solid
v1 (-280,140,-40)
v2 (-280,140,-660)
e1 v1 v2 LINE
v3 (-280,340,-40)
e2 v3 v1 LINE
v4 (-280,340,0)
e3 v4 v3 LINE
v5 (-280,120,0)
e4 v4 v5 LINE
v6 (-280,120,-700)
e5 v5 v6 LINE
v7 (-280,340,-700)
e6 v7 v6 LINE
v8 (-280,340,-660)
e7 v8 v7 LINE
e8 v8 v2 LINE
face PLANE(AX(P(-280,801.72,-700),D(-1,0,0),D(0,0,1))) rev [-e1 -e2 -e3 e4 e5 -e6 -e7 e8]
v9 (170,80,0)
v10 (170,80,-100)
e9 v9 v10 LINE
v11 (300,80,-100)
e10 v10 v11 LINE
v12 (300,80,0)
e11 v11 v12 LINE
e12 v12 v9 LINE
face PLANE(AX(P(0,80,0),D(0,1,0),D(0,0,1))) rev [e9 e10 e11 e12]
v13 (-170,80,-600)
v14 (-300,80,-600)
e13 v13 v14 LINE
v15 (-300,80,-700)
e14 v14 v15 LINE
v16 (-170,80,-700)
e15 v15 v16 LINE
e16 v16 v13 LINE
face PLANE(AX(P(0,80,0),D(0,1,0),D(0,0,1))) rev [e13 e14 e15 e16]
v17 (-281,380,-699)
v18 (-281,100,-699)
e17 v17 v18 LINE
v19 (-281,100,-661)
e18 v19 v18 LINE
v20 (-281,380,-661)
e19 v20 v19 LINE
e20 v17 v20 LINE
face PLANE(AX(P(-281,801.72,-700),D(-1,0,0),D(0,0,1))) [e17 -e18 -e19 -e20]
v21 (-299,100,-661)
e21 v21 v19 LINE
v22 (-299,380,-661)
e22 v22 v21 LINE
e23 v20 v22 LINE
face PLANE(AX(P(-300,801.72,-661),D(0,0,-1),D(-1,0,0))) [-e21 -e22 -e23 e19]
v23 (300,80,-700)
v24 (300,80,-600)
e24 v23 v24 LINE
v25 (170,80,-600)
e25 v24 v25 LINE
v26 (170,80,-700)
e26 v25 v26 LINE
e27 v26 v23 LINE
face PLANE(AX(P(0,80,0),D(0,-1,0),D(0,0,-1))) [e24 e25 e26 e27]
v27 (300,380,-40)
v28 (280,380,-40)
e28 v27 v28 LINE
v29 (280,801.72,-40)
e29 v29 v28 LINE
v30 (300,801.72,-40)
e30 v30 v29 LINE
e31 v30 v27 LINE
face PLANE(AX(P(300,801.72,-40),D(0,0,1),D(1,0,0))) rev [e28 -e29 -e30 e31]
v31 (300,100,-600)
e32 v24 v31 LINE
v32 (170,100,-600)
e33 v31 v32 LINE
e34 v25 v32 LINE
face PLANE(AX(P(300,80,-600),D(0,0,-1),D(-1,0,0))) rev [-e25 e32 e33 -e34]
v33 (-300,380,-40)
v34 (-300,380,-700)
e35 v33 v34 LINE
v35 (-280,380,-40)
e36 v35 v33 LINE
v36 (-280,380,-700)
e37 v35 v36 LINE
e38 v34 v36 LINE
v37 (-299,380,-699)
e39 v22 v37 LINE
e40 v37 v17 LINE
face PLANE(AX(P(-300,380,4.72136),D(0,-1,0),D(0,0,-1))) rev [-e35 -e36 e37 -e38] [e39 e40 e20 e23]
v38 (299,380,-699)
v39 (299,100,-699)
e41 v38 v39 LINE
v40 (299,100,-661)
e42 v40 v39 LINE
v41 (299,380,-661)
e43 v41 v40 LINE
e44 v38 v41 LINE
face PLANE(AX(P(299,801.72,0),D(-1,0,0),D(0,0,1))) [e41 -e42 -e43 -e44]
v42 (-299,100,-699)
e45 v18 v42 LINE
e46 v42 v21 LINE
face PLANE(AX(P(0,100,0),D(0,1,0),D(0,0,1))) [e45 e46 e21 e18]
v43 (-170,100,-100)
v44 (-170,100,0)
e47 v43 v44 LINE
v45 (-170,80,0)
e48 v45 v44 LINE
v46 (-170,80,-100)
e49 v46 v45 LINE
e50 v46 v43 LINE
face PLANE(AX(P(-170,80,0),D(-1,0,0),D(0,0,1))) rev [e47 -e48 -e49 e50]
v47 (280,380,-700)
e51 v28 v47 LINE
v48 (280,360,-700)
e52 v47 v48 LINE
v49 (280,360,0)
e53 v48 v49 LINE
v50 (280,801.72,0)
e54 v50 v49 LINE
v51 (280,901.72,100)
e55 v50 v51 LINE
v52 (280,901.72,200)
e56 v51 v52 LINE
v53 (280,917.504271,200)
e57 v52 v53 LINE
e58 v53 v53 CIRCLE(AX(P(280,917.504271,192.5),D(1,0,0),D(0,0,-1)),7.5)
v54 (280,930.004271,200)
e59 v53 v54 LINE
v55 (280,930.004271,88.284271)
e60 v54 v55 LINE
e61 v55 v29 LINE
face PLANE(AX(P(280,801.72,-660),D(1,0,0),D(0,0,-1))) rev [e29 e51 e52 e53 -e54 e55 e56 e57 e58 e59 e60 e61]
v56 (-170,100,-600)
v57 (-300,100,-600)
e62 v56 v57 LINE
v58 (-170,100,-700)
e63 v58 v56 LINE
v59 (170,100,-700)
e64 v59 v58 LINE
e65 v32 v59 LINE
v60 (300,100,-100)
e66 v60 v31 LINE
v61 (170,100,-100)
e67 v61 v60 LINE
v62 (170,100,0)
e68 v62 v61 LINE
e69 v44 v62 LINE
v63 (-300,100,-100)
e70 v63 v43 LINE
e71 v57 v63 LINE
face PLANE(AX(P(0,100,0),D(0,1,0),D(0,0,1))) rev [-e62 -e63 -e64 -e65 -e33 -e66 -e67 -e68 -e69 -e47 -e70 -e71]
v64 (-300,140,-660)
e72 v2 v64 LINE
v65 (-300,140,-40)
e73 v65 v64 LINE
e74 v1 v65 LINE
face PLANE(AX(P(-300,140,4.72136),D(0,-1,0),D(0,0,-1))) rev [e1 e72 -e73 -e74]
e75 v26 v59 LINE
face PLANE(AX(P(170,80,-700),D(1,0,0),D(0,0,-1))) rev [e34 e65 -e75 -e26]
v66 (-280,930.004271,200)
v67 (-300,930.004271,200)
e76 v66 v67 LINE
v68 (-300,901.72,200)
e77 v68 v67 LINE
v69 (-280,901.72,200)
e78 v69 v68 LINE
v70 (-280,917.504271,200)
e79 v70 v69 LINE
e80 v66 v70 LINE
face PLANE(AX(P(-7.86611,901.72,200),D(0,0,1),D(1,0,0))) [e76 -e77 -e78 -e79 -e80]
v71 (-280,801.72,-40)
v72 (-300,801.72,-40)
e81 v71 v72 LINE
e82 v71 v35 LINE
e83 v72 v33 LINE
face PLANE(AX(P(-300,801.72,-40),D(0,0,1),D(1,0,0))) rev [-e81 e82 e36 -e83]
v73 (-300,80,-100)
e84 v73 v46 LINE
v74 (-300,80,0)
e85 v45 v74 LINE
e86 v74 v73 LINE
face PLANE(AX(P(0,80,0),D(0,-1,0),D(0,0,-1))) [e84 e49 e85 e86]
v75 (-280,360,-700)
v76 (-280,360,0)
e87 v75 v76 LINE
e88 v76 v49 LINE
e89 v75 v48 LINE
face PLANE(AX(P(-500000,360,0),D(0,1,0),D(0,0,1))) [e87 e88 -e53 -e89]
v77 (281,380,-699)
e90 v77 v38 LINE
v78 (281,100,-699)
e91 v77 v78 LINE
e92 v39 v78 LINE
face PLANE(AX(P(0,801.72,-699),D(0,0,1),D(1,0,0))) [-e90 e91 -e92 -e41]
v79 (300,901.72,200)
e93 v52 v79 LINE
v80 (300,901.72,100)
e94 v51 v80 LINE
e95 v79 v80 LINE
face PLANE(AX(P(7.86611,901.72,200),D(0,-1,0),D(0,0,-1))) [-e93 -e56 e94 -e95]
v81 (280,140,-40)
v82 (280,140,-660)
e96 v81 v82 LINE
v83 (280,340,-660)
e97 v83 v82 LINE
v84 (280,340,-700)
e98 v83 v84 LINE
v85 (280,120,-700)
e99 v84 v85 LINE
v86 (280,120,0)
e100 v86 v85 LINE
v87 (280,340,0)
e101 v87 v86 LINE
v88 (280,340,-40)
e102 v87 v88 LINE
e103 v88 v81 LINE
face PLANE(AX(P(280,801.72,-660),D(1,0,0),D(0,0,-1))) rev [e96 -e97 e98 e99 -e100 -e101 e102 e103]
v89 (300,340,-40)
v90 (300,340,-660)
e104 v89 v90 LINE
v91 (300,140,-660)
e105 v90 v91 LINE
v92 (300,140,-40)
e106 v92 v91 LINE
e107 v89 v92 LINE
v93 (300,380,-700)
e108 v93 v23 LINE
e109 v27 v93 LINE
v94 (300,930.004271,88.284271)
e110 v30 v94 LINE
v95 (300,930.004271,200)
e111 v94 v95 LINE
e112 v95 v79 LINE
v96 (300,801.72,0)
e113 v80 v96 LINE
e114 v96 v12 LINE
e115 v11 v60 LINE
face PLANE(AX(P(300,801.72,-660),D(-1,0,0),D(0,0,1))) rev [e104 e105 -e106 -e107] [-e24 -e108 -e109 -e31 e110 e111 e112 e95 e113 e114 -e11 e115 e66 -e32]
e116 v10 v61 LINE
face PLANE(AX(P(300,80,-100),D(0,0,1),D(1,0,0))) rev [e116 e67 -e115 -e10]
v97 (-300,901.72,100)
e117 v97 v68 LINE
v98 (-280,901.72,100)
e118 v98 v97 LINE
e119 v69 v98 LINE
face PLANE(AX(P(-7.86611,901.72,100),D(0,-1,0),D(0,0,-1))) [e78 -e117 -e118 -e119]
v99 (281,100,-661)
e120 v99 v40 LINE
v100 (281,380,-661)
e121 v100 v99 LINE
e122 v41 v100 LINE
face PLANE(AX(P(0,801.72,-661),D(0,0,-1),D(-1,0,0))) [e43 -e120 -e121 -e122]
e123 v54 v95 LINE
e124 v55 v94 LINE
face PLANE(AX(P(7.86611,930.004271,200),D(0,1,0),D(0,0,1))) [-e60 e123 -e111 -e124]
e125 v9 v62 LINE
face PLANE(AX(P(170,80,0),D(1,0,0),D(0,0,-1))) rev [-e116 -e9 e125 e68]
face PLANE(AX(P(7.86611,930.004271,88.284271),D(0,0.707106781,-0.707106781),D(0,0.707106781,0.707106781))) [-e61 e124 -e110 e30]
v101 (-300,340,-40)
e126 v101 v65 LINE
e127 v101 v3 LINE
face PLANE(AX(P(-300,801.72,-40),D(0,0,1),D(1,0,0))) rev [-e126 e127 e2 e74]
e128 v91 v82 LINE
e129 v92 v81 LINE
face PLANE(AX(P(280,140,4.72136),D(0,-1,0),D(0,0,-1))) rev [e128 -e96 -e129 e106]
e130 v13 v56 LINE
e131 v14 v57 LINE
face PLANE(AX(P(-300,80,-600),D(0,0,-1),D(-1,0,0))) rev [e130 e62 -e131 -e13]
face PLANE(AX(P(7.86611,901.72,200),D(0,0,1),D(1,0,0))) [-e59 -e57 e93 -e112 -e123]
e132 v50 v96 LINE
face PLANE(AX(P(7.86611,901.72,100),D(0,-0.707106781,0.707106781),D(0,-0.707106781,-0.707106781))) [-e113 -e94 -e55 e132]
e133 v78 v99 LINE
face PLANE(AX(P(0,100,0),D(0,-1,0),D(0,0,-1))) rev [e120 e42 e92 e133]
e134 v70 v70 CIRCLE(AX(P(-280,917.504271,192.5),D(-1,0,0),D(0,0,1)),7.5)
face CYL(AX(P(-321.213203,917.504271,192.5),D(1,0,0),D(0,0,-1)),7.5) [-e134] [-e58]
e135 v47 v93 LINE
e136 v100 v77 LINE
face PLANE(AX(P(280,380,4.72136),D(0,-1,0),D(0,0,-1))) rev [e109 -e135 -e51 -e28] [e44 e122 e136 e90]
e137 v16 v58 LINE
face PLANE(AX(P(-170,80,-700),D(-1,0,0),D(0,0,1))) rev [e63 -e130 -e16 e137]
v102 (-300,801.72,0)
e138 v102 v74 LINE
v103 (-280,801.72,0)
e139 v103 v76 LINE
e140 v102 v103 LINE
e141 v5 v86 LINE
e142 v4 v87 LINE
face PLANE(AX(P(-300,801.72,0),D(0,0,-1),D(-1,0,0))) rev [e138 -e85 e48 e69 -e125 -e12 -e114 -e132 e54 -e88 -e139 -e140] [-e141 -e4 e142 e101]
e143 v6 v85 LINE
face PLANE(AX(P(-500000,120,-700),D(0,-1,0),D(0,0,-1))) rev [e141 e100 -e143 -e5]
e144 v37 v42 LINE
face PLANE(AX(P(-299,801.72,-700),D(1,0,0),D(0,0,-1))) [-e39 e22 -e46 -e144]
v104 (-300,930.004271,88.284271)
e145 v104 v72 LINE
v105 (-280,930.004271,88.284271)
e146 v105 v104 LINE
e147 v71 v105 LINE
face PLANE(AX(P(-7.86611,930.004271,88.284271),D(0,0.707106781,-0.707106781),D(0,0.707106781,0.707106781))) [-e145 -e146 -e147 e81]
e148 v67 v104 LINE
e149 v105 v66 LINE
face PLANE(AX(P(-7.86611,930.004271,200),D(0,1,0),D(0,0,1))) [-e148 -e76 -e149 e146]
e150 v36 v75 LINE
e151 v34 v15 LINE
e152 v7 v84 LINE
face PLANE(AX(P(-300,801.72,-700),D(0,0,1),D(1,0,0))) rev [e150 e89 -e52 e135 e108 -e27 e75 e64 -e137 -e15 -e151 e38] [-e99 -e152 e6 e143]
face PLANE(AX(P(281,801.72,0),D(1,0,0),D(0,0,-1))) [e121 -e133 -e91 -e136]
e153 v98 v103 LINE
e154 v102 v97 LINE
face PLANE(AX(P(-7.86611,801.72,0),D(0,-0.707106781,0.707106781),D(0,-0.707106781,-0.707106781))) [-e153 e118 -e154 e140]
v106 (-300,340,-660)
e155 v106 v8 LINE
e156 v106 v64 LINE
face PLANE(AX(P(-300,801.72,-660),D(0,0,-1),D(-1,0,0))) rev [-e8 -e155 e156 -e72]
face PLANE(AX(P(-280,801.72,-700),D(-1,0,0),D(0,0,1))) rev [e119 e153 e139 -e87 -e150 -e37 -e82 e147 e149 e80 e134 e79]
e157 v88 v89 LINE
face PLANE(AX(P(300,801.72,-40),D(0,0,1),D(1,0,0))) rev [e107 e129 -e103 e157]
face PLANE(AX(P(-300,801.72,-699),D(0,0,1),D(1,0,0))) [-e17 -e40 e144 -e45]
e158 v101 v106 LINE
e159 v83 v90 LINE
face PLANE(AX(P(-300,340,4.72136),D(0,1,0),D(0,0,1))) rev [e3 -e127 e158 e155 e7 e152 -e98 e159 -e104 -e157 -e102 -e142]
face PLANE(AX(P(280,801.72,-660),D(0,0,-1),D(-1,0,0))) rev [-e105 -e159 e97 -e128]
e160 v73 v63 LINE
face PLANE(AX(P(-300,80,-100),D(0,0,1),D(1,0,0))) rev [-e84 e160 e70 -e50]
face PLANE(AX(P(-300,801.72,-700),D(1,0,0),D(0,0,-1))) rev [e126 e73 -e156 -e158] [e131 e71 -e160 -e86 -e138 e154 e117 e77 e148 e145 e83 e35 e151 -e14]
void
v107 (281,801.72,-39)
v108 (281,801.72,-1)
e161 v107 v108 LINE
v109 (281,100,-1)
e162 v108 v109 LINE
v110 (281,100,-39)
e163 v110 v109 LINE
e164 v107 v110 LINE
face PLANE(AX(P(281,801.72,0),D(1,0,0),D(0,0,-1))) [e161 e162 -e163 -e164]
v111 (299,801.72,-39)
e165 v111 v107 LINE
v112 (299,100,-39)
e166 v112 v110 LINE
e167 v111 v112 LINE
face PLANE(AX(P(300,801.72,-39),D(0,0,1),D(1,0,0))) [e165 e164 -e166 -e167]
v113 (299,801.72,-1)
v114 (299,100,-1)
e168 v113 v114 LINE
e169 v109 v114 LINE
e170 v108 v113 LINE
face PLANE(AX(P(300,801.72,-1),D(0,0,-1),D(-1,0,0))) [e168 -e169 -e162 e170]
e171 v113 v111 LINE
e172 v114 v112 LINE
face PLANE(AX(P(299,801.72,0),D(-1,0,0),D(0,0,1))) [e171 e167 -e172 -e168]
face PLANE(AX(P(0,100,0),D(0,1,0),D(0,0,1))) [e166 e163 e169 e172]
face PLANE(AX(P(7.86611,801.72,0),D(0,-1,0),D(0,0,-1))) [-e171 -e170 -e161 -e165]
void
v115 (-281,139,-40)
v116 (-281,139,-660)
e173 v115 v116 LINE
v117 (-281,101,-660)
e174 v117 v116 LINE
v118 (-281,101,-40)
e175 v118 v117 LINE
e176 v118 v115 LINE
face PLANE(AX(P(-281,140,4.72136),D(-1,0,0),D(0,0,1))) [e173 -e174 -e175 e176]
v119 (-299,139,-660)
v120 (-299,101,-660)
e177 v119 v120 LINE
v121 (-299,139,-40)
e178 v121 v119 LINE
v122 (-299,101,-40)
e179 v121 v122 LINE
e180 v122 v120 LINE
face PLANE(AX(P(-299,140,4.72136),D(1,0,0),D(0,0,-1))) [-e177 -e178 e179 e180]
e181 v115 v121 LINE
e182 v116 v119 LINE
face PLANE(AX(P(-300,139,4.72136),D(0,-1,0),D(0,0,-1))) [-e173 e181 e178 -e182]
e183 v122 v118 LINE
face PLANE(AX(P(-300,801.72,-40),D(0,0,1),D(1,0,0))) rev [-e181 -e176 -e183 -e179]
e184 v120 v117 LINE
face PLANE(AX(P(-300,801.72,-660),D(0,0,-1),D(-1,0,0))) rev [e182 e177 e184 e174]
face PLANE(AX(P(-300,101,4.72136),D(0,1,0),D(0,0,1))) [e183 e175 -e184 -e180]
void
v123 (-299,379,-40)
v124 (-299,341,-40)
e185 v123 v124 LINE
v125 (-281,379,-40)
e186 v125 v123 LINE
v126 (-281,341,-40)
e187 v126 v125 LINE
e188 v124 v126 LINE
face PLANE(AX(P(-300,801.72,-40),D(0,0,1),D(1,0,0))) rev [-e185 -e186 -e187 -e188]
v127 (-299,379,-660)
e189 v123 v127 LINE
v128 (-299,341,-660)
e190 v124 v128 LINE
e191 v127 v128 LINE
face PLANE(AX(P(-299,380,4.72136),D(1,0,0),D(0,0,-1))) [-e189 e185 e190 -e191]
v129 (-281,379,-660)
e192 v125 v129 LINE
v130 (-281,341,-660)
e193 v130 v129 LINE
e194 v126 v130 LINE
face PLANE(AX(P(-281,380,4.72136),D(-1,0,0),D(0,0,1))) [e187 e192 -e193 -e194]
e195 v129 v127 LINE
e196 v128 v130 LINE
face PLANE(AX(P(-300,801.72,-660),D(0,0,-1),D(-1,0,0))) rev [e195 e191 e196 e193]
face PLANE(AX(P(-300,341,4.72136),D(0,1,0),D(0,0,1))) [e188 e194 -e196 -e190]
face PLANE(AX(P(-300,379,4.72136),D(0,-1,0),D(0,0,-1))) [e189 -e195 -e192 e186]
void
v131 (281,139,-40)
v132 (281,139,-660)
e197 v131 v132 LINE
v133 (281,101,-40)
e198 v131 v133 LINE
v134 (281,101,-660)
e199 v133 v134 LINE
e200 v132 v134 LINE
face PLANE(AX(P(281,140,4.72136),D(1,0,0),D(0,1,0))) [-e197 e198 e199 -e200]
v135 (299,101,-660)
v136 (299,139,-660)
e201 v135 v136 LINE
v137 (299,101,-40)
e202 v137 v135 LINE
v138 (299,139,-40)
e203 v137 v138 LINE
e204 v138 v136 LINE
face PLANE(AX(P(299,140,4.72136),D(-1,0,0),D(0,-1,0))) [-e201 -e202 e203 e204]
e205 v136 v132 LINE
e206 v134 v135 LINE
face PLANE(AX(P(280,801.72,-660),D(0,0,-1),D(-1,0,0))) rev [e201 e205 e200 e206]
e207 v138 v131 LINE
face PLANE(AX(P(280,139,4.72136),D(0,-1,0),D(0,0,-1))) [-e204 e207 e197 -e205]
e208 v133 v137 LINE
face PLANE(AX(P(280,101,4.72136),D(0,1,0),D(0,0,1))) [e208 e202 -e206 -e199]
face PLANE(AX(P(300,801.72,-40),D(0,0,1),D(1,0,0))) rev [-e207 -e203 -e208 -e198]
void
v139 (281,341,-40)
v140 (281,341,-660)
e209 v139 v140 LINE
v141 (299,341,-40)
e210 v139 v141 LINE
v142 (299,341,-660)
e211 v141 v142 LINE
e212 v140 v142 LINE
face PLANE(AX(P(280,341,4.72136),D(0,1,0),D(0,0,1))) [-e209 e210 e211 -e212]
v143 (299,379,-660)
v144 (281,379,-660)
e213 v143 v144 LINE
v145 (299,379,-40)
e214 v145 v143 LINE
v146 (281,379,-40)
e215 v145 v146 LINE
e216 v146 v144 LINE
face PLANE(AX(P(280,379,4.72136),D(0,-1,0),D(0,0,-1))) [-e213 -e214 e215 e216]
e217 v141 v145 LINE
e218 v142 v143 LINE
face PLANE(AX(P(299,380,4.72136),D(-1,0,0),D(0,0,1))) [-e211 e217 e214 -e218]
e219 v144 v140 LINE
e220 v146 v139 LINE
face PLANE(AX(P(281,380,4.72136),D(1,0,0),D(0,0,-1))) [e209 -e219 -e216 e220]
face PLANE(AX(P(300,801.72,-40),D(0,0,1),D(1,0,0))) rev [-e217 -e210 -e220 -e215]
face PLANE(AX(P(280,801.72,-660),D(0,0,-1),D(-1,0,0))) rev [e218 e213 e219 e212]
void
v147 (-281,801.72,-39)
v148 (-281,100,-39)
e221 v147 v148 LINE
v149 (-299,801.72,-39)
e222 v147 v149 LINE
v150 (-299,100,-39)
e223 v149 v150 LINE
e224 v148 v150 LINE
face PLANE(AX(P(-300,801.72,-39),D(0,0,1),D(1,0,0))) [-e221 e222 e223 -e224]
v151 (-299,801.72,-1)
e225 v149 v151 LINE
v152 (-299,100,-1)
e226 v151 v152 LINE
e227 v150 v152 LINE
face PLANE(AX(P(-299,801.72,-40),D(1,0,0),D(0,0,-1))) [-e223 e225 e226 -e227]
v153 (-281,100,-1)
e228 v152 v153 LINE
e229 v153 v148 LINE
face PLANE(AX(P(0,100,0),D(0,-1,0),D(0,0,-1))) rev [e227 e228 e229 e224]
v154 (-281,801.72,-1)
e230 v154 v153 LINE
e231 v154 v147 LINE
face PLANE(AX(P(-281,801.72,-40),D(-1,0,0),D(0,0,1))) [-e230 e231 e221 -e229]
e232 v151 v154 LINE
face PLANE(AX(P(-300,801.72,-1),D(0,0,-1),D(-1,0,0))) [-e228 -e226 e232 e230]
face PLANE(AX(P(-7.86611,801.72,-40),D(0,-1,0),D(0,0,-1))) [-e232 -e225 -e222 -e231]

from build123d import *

# Parameters (mm, degrees)
EXTRUDE_THIN1_START             = 100
EXTRUDE_THIN1_OUTLINE_W         = 20
EXTRUDE_THIN1_OUTLINE_H         = 40
EXTRUDE_THIN1_OUTLINE_W_2       = 18
EXTRUDE_THIN1_OUTLINE_H_2       = 38
EXTRUDE_THIN1_DEPTH             = 701.72
SKETCH5_W                       = 20
SKETCH5_H                       = 40
SKETCH5_W_2                     = 18
SKETCH5_H_2                     = 38
EXTRUDE_THIN2_DEPTH             = 620
SKETCH6_W                       = 20
SKETCH6_H                       = 421.72
CUT_EXTRUDE1_DEPTH              = 1081.904694411
BOSS_EXTRUDE1_REACH             = 1107.783
SKETCH8_W                       = 700
SKETCH8_H                       = 20
BOSS_EXTRUDE1_DIRECTION_2_REACH = 1107.783
BOSS_EXTRUDE2_REACH             = 1214.087
SKETCH9_W                       = 700
SKETCH9_H                       = 20
BOSS_EXTRUDE3_DEPTH             = 20
BOSS_EXTRUDE4_DEPTH             = 20
BOSS_EXTRUDE5_REACH             = 1311.545
SKETCH12_R                      = 7.5
SKETCH16_W                      = 130
SKETCH16_H                      = 100
BOSS_EXTRUDE6_DEPTH             = 20


# Read off the part's stored shape, not the designer's step: Extrude-Thin1
with BuildPart() as part:
    # Extrude-Thin1 outline → Extrude-Thin1 (new body)
    # profile 1 of 4: a face of its own
    with BuildSketch(Plane(origin=(0, 0, 0), x_dir=(1, 0, 0), z_dir=(0, 1, 0)).offset(EXTRUDE_THIN1_START)):
        with Locations((-290, 680)):
            Rectangle(EXTRUDE_THIN1_OUTLINE_W, EXTRUDE_THIN1_OUTLINE_H)
        with Locations((-290, 680)):
            Rectangle(EXTRUDE_THIN1_OUTLINE_W_2, EXTRUDE_THIN1_OUTLINE_H_2, mode=Mode.SUBTRACT)
    # profile 2 of 4: a face of its own
    with BuildSketch(Plane(origin=(0, 0, 0), x_dir=(1, 0, 0), z_dir=(0, 1, 0)).offset(EXTRUDE_THIN1_START)):
        with Locations((290, 680)):
            Rectangle(EXTRUDE_THIN1_OUTLINE_W, EXTRUDE_THIN1_OUTLINE_H)
        with Locations((290, 680)):
            Rectangle(EXTRUDE_THIN1_OUTLINE_W_2, EXTRUDE_THIN1_OUTLINE_H_2, mode=Mode.SUBTRACT)
    # profile 3 of 4: a face of its own
    with BuildSketch(Plane(origin=(0, 0, 0), x_dir=(1, 0, 0), z_dir=(0, 1, 0)).offset(EXTRUDE_THIN1_START)):
        with Locations((290, 20)):
            Rectangle(EXTRUDE_THIN1_OUTLINE_W, EXTRUDE_THIN1_OUTLINE_H)
        with Locations((290, 20)):
            Rectangle(EXTRUDE_THIN1_OUTLINE_W_2, EXTRUDE_THIN1_OUTLINE_H_2, mode=Mode.SUBTRACT)
    # profile 4 of 4: a face of its own
    with BuildSketch(Plane(origin=(0, 0, 0), x_dir=(1, 0, 0), z_dir=(0, 1, 0)).offset(EXTRUDE_THIN1_START)):
        with Locations((-290, 20)):
            Rectangle(EXTRUDE_THIN1_OUTLINE_W, EXTRUDE_THIN1_OUTLINE_H)
        with Locations((-290, 20)):
            Rectangle(EXTRUDE_THIN1_OUTLINE_W_2, EXTRUDE_THIN1_OUTLINE_H_2, mode=Mode.SUBTRACT)
    extrude(amount=EXTRUDE_THIN1_DEPTH)

    # Sketch5 → Extrude-Thin2 (add)
    # profile 1 of 4: a face of its own
    with BuildSketch(Plane.XY.offset(-660)):
        with Locations((-290, 360)):
            Rectangle(SKETCH5_W, SKETCH5_H)
        with Locations((-290, 360)):
            Rectangle(SKETCH5_W_2, SKETCH5_H_2, mode=Mode.SUBTRACT)
    # profile 2 of 4: a face of its own
    with BuildSketch(Plane.XY.offset(-660)):
        with Locations((290, 360)):
            Rectangle(SKETCH5_W, SKETCH5_H)
        with Locations((290, 360)):
            Rectangle(SKETCH5_W_2, SKETCH5_H_2, mode=Mode.SUBTRACT)
    # profile 3 of 4: a face of its own
    with BuildSketch(Plane.XY.offset(-660)):
        with Locations((-290, 120)):
            Rectangle(SKETCH5_W, SKETCH5_H)
        with Locations((-290, 120)):
            Rectangle(SKETCH5_W_2, SKETCH5_H_2, mode=Mode.SUBTRACT)
    # profile 4 of 4: a face of its own
    with BuildSketch(Plane.XY.offset(-660)):
        with Locations((290, 120)):
            Rectangle(SKETCH5_W, SKETCH5_H)
        with Locations((290, 120)):
            Rectangle(SKETCH5_W_2, SKETCH5_H_2, mode=Mode.SUBTRACT)
    extrude(amount=EXTRUDE_THIN2_DEPTH)

    # Sketch6 → Cut-Extrude1 (cut, through all)
    with BuildSketch(Plane.XY.offset(-660)):
        with Locations((290, 590.86)):
            Rectangle(SKETCH6_W, SKETCH6_H)
        with Locations((-290, 590.86)):
            Rectangle(SKETCH6_W, SKETCH6_H)
    extrude(amount=-CUT_EXTRUDE1_DEPTH, mode=Mode.SUBTRACT)

    # Sketch8 → Boss-Extrude1 (add, up to next)
    with BuildSketch(Plane(origin=(0, 0, 0), x_dir=(0, 0, -1), z_dir=(1, 0, 0)), mode=Mode.PRIVATE) as boss_extrude1_sk1:
        with Locations((350, 350)):
            Rectangle(SKETCH8_W, SKETCH8_H)
    boss_extrude1_tool1 = extrude(boss_extrude1_sk1.sketch, amount=BOSS_EXTRUDE1_REACH, mode=Mode.PRIVATE) - part.part
    add(boss_extrude1_tool1.solids().sort_by_distance((0, 350, -350))[0])

    # Sketch8 → Boss-Extrude1 direction 2 (add, up to next)
    with BuildSketch(Plane(origin=(0, 0, 0), x_dir=(0, 0, -1), z_dir=(1, 0, 0)), mode=Mode.PRIVATE) as boss_extrude1_direction_2_sk1:
        with Locations((350, 350)):
            Rectangle(SKETCH8_W, SKETCH8_H)
    boss_extrude1_direction_2_tool1 = extrude(boss_extrude1_direction_2_sk1.sketch, amount=-BOSS_EXTRUDE1_DIRECTION_2_REACH, mode=Mode.PRIVATE) - part.part
    add(boss_extrude1_direction_2_tool1.solids().sort_by_distance((0, 350, -350))[0])

    # Sketch9 → Boss-Extrude2 (add, up to next)
    with BuildSketch(Plane.ZY.offset(-280), mode=Mode.PRIVATE) as boss_extrude2_sk1:
        with Locations((-350, 110)):
            Rectangle(SKETCH9_W, SKETCH9_H)
    boss_extrude2_tool1 = extrude(boss_extrude2_sk1.sketch, amount=BOSS_EXTRUDE2_REACH, mode=Mode.PRIVATE) - part.part
    add(boss_extrude2_tool1.solids().sort_by_distance((280, 110, -350))[0])

    # Sketch10 → Boss-Extrude3 (add)
    with BuildSketch(Plane(origin=(300, 0, 0), x_dir=(0, 0, -1), z_dir=(1, 0, 0))):
        Polygon((-200, 901.72), (-100, 901.72), (0, 801.72), (40, 801.72), (-88.284271247, 930.004271247), (-200, 930.004271247), align=None)
    extrude(amount=-BOSS_EXTRUDE3_DEPTH)

    # Sketch11 → Boss-Extrude4 (add)
    with BuildSketch(Plane.ZY.offset(300)):
        Polygon((-40, 801.72), (0, 801.72), (100, 901.72), (200, 901.72), (200, 930.004271247), (88.284271247, 930.004271247), align=None)
    extrude(amount=-BOSS_EXTRUDE4_DEPTH)

    # Sketch12 → Boss-Extrude5 (add, up to next)
    with BuildSketch(Plane(origin=(300, 0, 0), x_dir=(0, 0, -1), z_dir=(1, 0, 0)), mode=Mode.PRIVATE) as boss_extrude5_sk1:
        with Locations(Location((-192.5, 917.504271247, 0), (0, 0, 180))):
            Circle(SKETCH12_R)
    boss_extrude5_tool1 = extrude(boss_extrude5_sk1.sketch, amount=-BOSS_EXTRUDE5_REACH, mode=Mode.PRIVATE) - part.part
    add(boss_extrude5_tool1.solids().sort_by_distance((300, 917.504271, 192.5))[0])

    # Sketch16 → Boss-Extrude6 (add)
    with BuildSketch(Plane.XZ.offset(-100)):
        with Locations((-235, -50)):
            Rectangle(SKETCH16_W, SKETCH16_H)
        with Locations((235, -50)):
            Rectangle(SKETCH16_W, SKETCH16_H)
        with Locations((235, -650)):
            Rectangle(SKETCH16_W, SKETCH16_H)
        with Locations((-235, -650)):
            Rectangle(SKETCH16_W, SKETCH16_H)
    extrude(amount=BOSS_EXTRUDE6_DEPTH)


solid = part.part
